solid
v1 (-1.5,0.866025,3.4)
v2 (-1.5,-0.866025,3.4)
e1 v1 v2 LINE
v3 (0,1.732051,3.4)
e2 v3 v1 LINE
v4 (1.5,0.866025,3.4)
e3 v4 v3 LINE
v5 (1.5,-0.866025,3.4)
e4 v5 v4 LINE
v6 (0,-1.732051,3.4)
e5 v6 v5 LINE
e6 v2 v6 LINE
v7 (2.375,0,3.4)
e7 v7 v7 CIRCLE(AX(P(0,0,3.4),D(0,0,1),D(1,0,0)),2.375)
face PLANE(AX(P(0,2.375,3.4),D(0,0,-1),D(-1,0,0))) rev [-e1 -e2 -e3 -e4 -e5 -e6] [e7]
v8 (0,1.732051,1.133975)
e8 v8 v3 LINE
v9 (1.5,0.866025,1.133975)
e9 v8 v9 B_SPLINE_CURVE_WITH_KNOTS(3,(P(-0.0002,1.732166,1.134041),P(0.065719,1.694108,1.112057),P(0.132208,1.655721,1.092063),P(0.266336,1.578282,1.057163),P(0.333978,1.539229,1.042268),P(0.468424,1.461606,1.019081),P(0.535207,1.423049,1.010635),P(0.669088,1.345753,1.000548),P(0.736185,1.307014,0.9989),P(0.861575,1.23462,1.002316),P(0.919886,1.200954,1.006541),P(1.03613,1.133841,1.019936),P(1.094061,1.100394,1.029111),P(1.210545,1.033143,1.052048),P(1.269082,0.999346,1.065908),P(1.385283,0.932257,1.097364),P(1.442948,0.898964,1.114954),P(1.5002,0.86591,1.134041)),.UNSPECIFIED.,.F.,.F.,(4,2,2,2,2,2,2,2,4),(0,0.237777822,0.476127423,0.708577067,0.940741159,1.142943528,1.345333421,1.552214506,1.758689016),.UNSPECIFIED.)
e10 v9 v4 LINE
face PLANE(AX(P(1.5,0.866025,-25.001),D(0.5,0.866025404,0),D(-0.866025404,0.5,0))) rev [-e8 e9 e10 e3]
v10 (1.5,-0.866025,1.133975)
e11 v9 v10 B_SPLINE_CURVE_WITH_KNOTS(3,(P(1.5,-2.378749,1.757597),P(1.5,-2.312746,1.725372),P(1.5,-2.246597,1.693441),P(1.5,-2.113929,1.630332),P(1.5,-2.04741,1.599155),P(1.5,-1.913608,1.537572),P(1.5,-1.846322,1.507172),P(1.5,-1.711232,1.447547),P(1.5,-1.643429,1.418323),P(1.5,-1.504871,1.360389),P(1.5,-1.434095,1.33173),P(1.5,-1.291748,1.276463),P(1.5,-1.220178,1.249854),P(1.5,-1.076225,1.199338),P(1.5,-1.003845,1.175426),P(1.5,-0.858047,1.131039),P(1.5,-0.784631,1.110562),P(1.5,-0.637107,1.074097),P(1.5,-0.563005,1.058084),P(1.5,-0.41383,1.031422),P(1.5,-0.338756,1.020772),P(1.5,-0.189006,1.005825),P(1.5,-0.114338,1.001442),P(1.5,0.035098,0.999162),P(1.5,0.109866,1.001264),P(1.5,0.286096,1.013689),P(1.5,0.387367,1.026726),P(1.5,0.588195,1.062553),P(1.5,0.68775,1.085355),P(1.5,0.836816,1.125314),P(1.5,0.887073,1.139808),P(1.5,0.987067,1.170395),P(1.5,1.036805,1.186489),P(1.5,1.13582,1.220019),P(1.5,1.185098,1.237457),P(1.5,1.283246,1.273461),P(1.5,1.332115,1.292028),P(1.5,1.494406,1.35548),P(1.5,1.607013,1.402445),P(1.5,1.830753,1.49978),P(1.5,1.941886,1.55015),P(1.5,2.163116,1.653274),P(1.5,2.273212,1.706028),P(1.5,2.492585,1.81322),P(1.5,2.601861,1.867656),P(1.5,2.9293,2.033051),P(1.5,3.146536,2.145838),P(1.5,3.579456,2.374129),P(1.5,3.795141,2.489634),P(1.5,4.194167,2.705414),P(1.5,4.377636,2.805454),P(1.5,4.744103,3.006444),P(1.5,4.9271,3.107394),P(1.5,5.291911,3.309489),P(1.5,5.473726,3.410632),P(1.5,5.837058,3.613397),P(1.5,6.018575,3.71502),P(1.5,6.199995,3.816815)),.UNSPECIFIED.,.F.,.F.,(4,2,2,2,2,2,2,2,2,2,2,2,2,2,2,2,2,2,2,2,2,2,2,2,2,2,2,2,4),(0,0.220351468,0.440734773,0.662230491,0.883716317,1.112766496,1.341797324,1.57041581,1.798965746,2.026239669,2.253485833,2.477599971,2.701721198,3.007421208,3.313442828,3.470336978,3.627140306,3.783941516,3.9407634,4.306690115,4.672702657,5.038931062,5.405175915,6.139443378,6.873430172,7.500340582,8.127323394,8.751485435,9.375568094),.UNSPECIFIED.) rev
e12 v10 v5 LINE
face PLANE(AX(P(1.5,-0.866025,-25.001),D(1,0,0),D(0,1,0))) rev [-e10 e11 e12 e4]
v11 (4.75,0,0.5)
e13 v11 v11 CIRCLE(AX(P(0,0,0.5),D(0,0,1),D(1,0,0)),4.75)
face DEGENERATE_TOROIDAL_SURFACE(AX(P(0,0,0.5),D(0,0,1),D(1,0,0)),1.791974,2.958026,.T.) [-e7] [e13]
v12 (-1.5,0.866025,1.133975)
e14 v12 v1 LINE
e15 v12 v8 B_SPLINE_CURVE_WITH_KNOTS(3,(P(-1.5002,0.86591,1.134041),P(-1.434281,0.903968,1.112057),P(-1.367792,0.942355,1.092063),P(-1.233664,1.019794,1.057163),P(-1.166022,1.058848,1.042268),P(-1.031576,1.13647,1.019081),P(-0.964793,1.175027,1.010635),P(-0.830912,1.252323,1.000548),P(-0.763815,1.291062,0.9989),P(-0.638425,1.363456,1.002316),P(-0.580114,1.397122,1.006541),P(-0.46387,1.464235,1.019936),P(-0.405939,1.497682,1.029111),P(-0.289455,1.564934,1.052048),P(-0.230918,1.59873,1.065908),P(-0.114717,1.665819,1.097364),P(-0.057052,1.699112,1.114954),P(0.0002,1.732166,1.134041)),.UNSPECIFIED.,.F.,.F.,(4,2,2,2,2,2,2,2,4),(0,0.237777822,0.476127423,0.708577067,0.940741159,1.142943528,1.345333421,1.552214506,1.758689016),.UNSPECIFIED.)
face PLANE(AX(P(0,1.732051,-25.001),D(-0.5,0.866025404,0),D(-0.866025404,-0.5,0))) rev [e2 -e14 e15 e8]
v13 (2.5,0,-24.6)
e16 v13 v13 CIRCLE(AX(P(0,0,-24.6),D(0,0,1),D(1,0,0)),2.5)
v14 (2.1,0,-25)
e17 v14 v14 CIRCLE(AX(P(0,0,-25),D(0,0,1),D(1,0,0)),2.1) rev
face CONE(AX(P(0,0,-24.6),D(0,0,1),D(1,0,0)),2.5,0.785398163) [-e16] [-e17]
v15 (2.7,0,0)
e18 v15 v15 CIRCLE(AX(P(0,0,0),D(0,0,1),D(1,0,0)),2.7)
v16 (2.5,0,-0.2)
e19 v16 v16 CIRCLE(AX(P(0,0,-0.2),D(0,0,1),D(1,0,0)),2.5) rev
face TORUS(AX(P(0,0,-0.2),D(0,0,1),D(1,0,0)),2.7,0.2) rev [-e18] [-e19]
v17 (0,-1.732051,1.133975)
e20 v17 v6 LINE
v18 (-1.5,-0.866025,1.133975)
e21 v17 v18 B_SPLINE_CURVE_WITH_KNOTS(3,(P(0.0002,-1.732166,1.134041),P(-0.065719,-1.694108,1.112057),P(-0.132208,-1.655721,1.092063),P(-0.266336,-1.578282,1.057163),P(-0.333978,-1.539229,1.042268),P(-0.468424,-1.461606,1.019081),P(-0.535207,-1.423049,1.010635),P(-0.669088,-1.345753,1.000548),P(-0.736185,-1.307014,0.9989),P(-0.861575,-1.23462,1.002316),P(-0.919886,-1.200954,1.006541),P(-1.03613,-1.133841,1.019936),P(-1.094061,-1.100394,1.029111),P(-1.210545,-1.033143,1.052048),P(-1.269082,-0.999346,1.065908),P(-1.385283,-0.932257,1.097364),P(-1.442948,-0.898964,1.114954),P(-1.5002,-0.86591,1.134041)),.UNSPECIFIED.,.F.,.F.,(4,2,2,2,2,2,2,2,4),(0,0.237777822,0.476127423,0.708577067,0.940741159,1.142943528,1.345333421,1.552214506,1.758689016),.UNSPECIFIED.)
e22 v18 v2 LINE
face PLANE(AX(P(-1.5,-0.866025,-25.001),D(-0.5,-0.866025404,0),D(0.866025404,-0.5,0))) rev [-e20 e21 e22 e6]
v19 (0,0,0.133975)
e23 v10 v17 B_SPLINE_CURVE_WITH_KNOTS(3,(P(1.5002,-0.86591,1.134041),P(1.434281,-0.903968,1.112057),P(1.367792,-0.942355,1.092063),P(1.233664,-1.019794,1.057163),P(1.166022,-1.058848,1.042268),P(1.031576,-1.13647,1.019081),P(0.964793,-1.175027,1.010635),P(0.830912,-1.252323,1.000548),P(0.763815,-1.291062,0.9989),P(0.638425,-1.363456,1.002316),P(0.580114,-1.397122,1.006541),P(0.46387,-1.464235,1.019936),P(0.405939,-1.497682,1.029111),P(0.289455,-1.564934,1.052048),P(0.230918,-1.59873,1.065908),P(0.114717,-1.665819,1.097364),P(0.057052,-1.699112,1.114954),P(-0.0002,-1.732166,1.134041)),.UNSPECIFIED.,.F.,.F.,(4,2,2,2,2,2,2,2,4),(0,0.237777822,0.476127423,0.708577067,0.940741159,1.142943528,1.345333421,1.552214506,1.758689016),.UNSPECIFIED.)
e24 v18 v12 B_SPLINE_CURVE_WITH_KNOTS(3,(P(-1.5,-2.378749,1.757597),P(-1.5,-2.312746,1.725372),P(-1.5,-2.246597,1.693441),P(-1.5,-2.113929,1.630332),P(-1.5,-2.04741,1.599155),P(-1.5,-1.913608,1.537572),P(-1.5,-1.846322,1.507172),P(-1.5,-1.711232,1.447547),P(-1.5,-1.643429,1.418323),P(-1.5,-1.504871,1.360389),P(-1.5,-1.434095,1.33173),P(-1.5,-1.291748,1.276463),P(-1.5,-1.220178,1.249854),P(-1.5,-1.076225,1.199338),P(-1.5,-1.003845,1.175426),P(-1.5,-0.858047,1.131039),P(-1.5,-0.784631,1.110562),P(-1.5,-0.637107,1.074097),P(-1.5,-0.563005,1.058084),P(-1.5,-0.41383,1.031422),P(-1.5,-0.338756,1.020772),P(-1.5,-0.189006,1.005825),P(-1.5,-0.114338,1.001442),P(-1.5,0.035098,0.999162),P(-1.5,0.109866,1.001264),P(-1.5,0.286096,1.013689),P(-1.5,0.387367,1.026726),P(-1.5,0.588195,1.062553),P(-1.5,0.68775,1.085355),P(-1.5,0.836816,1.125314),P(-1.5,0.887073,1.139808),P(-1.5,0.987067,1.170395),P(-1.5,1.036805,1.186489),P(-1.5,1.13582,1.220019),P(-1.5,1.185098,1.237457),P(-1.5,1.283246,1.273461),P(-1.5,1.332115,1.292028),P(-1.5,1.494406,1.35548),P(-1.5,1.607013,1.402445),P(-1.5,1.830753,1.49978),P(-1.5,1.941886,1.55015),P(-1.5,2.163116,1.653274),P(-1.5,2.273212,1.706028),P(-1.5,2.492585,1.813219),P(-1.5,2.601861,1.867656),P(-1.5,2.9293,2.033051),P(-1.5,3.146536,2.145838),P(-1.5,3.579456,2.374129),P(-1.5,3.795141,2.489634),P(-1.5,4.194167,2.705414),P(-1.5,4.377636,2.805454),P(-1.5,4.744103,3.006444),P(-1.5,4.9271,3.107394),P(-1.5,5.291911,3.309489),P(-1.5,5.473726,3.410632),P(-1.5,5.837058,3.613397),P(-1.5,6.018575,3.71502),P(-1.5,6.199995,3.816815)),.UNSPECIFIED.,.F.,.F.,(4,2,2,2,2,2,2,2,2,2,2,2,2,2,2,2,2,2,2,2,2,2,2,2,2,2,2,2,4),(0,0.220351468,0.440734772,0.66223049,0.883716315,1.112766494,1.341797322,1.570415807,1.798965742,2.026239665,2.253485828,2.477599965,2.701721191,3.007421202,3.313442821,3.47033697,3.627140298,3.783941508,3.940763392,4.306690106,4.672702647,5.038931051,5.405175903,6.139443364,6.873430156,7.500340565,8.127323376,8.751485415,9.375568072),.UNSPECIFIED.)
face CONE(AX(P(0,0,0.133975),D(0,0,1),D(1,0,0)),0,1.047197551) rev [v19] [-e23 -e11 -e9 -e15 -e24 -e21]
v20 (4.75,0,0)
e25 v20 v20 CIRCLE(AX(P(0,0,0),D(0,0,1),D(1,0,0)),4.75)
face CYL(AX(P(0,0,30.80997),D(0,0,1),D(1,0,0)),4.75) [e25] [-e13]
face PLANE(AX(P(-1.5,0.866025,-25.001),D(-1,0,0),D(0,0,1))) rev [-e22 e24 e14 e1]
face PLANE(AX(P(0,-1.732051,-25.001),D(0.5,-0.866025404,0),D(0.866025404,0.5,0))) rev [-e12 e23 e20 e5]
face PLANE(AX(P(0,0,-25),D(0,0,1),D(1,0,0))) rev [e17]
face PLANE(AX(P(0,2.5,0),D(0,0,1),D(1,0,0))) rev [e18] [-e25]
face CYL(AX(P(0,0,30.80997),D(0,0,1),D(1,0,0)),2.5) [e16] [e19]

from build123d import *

# Parameters (mm, degrees)
CHAMFER1_SIZE      = 0.4
CUT_EXTRUDE1_START = -2.4000001
CUT_EXTRUDE1_DEPTH = 3.4000001
FILLET1_R          = 0.2


with BuildPart() as part:
    # Sketch1 → Revolve1 (revolve)
    with BuildSketch(Plane(origin=(0, 0, 0), x_dir=(0, 0, -1), z_dir=(1, 0, 0)), mode=Mode.PRIVATE) as revolve1_sk:
        with BuildLine():
            Line((25, 0), (25, 2.5))
            Line((25, 2.5), (0, 2.5))
            Line((0, 2.5), (0, 4.75))
            Line((0, 4.75), (-0.5, 4.75))
            ThreePointArc((-0.5, 4.75), (-2.374208166, 4.080480498), (-3.4, 2.375))
            Line((-3.4, 2.375), (-3.4, 0))
            Line((-3.4, 0), (25, 0))
        make_face()
    revolve(revolve1_sk.sketch.rotate(Axis((0, 0, 30.809969789), (0, 0, -1)), 90), axis=Axis((0, 0, 30.809969789), (0, 0, -1)))

    # Chamfer1
    chamfer1_edges = [part.edges().sort_by_distance(p)[0] for p in [
        (-2.5, 0, -25),
    ]]
    chamfer(chamfer1_edges, length=CHAMFER1_SIZE)

    # Sketch2 → Cut-Revolve1 (revolve, cut)
    with BuildSketch(Plane(origin=(0, 0, 0), x_dir=(0, 0, -1), z_dir=(1, 0, 0)), mode=Mode.PRIVATE) as cut_revolve1_sk:
        Polygon((-3.4, 0), (-3.4, 1.5), (-1, 1.5), (-0.133974596, 0), align=None)
    revolve(cut_revolve1_sk.sketch.rotate(Axis((0, 0, 2.452500839), (0, 0, -1)), 90), axis=Axis((0, 0, 2.452500839), (0, 0, -1)), mode=Mode.SUBTRACT)

    # Cut-Extrude1: read off the stored shape, not the designer's step
    # Cut-Extrude1 outline → Cut-Extrude1 (cut)
    with BuildSketch(Plane.XY.offset(3.4).offset(CUT_EXTRUDE1_START)):
        with BuildLine():
            Line((1.5, 0), (1.5, 0.866025404))
            Line((1.5, 0.866025404), (0.750000011, 1.299038099))
            ThreePointArc((0.750000011, 1.299038099), (1.299038109, 0.749999994), (1.5, 0))
        make_face()
        with BuildLine():
            ThreePointArc((-0.749999993, 1.29903811), (1e-08, 1.5), (0.750000011, 1.299038099))
            Line((0.750000011, 1.299038099), (0, 1.732050808))
            Line((0, 1.732050808), (-0.749999993, 1.29903811))
        make_face()
        with BuildLine():
            Line((1.5, -0.866025404), (1.5, 0))
            ThreePointArc((1.5, 0), (1.299038107, -0.749999997), (0.750000005, -1.299038103))
            Line((0.750000005, -1.299038103), (1.5, -0.866025404))
        make_face()
        with BuildLine():
            ThreePointArc((-1.5, 0), (-1.299038104, 0.750000003), (-0.749999993, 1.29903811))
            Line((-0.749999993, 1.29903811), (-1.5, 0.866025404))
            Line((-1.5, 0.866025404), (-1.5, 0))
        make_face()
        with BuildLine():
            Line((0, -1.732050808), (0.750000005, -1.299038103))
            ThreePointArc((0.750000005, -1.299038103), (3e-09, -1.5), (-0.75, -1.299038106))
            Line((-0.75, -1.299038106), (0, -1.732050808))
        make_face()
        with BuildLine():
            ThreePointArc((-0.75, -1.299038106), (-1.299038106, -0.75), (-1.5, 0))
            Line((-1.5, 0), (-1.5, -0.866025404))
            Line((-1.5, -0.866025404), (-0.75, -1.299038106))
        make_face()
    extrude(amount=CUT_EXTRUDE1_DEPTH, mode=Mode.SUBTRACT)

    # Cut-Extrude1 2 outline → Cut-Extrude1 2 (revolve)
    with BuildSketch(Plane.XZ):
        Polygon((1.732050837, 1.133974613), (1.499999957, 0.999999975), (1.732050808, 0.9999999), align=None)
    revolve(axis=Axis((0, 0, 0), (0, 0, 1)))

    # Fillet1
    fillet1_edges = [part.edges().sort_by_distance(p)[0] for p in [
        (-2.5, 0, 0),
    ]]
    fillet(fillet1_edges, radius=FILLET1_R)


solid = part.part
